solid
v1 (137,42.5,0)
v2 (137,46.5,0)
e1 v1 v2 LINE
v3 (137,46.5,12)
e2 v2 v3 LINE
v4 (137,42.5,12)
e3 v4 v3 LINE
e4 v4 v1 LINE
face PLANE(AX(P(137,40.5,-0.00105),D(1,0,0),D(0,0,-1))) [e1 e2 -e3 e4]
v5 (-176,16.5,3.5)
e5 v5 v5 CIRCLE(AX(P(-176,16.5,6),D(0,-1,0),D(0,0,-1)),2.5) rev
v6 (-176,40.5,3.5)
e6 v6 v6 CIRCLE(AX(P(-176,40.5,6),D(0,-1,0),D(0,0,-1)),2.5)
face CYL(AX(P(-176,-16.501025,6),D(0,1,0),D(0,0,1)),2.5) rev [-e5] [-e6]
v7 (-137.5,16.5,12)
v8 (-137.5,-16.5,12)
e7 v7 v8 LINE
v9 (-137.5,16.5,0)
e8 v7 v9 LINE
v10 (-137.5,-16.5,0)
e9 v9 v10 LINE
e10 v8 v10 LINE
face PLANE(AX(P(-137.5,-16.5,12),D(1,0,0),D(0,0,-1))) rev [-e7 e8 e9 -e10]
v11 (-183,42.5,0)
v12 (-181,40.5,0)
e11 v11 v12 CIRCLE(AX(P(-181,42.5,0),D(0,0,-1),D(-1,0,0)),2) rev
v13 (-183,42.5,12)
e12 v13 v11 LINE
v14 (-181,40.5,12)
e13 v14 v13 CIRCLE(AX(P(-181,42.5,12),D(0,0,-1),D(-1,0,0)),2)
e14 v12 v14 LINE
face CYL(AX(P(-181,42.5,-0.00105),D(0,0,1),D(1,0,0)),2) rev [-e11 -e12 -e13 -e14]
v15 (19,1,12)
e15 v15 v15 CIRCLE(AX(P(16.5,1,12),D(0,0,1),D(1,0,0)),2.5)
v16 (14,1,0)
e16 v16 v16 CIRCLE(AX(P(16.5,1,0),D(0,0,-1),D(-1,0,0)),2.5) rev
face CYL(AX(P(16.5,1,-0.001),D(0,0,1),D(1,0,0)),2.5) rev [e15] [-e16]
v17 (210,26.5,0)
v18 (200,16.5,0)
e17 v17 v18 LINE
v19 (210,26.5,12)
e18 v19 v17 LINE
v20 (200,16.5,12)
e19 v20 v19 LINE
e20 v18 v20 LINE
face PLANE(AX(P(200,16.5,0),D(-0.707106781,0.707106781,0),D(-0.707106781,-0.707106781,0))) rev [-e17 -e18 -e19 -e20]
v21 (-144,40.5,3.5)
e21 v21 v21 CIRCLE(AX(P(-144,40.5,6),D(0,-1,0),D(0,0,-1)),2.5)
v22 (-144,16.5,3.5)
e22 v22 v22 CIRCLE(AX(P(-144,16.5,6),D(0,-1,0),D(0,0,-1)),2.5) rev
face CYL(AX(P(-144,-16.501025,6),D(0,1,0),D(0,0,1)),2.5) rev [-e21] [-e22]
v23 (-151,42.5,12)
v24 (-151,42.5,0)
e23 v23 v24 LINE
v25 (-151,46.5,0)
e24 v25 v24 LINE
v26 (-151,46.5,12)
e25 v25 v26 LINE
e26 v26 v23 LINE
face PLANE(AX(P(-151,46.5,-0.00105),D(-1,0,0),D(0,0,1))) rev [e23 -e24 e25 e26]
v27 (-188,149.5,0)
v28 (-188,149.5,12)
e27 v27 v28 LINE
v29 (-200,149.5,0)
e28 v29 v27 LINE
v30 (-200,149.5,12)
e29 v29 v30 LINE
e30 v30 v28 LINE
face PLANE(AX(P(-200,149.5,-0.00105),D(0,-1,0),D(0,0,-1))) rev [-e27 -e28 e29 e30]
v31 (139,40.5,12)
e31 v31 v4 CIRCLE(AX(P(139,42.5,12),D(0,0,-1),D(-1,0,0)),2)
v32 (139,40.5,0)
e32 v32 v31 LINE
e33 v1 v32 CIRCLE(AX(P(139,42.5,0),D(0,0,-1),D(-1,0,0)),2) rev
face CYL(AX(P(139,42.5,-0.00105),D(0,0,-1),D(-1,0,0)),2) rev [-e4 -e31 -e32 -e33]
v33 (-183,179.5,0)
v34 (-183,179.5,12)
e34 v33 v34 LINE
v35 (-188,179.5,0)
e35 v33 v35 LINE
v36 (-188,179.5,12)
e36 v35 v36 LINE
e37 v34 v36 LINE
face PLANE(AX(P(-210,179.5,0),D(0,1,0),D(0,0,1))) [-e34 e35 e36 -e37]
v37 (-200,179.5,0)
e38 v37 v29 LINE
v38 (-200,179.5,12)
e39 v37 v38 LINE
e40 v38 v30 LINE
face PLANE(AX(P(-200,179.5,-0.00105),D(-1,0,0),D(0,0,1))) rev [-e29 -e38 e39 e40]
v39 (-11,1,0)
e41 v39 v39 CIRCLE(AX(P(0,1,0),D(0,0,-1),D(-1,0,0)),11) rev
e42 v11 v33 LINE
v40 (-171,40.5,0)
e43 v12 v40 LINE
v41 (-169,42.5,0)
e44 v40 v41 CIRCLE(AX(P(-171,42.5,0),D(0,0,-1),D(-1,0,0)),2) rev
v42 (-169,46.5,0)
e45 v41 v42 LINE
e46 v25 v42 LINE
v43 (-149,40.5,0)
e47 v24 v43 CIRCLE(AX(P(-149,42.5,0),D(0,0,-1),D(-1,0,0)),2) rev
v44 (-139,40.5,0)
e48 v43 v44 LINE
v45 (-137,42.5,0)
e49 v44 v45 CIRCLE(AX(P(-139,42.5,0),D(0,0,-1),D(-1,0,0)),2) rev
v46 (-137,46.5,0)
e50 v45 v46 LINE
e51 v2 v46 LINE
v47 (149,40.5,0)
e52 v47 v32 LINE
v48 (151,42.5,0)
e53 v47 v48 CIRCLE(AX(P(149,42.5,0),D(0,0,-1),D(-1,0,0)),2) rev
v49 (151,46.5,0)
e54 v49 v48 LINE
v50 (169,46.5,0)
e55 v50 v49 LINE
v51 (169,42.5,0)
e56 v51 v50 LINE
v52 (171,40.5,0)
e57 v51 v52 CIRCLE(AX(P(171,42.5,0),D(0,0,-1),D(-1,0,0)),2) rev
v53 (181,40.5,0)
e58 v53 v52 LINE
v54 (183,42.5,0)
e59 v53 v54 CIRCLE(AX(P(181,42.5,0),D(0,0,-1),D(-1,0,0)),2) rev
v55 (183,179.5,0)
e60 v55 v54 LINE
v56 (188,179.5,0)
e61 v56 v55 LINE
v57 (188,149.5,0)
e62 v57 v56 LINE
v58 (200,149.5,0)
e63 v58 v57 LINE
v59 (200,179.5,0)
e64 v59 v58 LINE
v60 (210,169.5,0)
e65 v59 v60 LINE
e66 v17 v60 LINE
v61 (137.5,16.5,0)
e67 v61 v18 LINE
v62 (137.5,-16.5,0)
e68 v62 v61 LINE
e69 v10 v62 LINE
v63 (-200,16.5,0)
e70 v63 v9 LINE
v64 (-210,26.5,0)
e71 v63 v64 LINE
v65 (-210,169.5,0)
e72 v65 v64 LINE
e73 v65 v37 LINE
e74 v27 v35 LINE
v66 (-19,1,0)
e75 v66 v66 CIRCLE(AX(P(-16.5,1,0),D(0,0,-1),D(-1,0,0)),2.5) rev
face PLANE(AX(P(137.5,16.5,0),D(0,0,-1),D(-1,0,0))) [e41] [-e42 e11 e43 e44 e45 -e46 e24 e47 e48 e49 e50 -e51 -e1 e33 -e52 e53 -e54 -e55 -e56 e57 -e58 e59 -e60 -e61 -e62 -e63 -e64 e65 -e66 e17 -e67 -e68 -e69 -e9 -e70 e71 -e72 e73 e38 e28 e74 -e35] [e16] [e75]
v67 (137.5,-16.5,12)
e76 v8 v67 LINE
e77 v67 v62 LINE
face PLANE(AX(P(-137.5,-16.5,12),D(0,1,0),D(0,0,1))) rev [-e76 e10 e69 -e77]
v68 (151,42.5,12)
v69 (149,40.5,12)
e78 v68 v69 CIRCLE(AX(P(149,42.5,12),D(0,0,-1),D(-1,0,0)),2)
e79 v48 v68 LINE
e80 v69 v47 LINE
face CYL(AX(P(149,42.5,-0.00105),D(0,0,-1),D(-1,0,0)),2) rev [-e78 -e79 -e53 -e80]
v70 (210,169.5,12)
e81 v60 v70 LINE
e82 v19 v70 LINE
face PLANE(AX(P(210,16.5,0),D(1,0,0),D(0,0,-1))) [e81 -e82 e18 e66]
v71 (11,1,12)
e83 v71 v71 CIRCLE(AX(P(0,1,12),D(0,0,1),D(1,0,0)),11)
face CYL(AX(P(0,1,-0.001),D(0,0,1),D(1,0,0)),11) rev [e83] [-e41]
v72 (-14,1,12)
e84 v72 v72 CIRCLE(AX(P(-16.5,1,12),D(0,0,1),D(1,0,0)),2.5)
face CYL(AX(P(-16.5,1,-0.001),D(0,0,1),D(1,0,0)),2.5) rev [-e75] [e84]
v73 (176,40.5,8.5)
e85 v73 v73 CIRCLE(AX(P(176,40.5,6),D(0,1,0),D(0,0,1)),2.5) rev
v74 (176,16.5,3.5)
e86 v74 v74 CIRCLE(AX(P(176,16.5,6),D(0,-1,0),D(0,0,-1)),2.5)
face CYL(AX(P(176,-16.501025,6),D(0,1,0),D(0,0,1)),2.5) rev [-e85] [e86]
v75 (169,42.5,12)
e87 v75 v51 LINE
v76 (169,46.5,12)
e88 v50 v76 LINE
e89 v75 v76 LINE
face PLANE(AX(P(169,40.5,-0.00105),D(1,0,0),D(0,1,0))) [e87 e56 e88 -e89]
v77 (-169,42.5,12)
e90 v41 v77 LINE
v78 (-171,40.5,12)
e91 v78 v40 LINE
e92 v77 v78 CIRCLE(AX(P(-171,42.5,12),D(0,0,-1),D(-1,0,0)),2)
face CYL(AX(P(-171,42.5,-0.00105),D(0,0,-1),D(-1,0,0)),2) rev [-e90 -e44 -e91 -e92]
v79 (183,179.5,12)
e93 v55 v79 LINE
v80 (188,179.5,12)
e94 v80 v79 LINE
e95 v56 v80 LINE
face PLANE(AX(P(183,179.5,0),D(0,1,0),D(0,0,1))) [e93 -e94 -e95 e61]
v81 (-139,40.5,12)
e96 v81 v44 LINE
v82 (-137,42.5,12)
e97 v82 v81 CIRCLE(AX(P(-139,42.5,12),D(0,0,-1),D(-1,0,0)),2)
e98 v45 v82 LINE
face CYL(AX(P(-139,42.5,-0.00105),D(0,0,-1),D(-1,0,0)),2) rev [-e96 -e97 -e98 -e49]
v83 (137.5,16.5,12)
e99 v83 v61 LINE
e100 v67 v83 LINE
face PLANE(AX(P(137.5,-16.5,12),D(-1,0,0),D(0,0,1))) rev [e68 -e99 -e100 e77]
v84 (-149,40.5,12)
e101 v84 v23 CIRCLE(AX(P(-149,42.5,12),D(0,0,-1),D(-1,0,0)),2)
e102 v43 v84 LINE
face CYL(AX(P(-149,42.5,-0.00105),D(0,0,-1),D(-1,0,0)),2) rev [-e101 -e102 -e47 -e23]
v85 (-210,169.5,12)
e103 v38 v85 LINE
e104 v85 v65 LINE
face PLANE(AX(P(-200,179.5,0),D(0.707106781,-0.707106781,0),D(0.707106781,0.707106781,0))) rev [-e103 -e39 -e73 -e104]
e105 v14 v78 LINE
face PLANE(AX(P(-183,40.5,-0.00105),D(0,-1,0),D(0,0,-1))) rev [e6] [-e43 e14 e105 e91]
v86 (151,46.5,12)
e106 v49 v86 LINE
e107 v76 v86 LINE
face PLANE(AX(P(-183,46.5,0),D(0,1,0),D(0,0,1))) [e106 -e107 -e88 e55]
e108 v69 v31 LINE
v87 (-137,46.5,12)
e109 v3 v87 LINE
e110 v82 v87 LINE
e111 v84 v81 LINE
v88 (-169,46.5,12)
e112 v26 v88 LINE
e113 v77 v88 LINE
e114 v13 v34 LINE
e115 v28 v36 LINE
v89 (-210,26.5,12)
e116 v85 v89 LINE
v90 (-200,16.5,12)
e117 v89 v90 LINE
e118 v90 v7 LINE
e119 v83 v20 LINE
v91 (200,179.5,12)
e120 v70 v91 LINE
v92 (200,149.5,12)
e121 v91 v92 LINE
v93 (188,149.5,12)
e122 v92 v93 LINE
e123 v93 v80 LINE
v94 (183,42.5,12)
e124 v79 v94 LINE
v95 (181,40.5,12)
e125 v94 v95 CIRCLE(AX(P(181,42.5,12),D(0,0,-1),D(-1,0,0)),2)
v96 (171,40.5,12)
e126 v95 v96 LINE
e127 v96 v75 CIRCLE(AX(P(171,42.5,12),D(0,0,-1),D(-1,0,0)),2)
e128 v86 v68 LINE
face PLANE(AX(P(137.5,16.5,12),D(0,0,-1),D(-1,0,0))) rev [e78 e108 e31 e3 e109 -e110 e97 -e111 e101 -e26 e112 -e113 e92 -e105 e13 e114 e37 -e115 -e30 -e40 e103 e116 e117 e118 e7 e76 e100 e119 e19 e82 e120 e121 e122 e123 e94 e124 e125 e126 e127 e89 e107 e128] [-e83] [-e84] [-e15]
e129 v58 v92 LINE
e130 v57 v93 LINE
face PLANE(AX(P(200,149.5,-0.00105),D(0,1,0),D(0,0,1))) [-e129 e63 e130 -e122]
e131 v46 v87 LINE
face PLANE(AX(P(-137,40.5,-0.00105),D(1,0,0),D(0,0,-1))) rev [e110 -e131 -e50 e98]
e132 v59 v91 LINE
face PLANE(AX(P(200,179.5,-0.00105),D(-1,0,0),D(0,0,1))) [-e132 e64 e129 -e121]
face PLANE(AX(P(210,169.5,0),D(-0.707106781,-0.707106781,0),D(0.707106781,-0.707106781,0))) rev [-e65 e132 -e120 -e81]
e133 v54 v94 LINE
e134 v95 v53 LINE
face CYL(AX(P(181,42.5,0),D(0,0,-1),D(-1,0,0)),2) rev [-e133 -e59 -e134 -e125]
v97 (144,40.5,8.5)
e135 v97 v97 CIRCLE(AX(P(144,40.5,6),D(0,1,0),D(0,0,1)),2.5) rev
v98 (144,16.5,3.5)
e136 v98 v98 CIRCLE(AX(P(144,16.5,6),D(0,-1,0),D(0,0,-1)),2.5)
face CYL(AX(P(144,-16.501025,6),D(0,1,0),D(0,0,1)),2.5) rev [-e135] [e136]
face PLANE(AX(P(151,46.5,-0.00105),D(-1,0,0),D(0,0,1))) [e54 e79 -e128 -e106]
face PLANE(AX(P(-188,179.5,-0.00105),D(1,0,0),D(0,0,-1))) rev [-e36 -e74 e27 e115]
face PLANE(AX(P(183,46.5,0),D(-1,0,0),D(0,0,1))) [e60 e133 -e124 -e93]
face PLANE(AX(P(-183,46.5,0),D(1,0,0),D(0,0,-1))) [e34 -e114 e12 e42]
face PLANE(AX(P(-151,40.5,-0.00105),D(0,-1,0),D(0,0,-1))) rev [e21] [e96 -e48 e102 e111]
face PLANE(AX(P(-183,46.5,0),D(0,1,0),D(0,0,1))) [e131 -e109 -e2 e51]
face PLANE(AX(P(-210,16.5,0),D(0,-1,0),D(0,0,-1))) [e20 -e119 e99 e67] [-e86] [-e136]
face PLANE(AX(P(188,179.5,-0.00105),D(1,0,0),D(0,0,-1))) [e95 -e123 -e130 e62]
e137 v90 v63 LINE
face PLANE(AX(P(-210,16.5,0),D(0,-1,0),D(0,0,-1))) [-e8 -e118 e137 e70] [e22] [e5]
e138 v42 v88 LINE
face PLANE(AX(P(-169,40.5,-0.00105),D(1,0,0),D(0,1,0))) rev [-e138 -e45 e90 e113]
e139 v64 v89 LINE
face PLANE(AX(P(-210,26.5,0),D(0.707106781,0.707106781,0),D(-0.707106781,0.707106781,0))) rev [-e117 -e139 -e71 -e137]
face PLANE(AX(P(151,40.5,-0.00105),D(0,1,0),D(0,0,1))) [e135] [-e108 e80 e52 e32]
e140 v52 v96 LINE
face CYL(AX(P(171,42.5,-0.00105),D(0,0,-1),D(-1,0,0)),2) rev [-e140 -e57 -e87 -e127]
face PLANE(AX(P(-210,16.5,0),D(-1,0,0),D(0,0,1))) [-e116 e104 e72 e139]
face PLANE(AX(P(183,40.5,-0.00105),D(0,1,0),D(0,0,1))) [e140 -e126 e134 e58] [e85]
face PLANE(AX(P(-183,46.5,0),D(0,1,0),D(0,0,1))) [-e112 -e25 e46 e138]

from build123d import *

# Parameters (mm, degrees)
SKETCH1_W            = 275
SKETCH1_H            = 33
BOSS_EXTRUDE1_DEPTH  = 12
CUT_EXTRUDE1_REACH   = 141.005
SKETCH2_R            = 11
SKETCH2_R_2          = 2.5
BOSS_EXTRUDE2_DEPTH  = 12
CUT_EXTRUDE2_REACH   = 250.863
SKETCH4_R            = 2.5
CUT_EXTRUDE3_REACH   = 278.522
SKETCH5_W            = 14
SKETCH5_H            = 6
FILLET1_R            = 2
FILLET1_OF_MIRROR2_R = 2
CHAMFER1_SIZE        = 10
CUT_EXTRUDE4_REACH   = 278.522
SKETCH6_W            = 12
SKETCH6_H            = 30
CHAMFER2_SIZE        = 10


with BuildPart() as part:
    # Sketch1 → Boss-Extrude1 (new body)
    with BuildSketch(Plane.XY):
        Rectangle(SKETCH1_W, SKETCH1_H)
    extrude(amount=BOSS_EXTRUDE1_DEPTH)

    # Sketch2 → Cut-Extrude1 (cut, up to next)
    with BuildSketch(Plane.XY.offset(12), mode=Mode.PRIVATE) as cut_extrude1_sk1:
        with Locations((0, 1)):
            Circle(SKETCH2_R)
    cut_extrude1_tool1 = extrude(cut_extrude1_sk1.sketch, amount=-CUT_EXTRUDE1_REACH, mode=Mode.PRIVATE) & part.part
    # Sketch2 → Cut-Extrude1 (cut, up to next)
    with BuildSketch(Plane.XY.offset(12), mode=Mode.PRIVATE) as cut_extrude1_sk2:
        with Locations((-16.5, 1)):
            Circle(SKETCH2_R_2)
    cut_extrude1_tool2 = extrude(cut_extrude1_sk2.sketch, amount=-CUT_EXTRUDE1_REACH, mode=Mode.PRIVATE) & part.part
    # Sketch2 → Cut-Extrude1 (cut, up to next)
    with BuildSketch(Plane.XY.offset(12), mode=Mode.PRIVATE) as cut_extrude1_sk3:
        with Locations((16.5, 1)):
            Circle(SKETCH2_R_2)
    cut_extrude1_tool3 = extrude(cut_extrude1_sk3.sketch, amount=-CUT_EXTRUDE1_REACH, mode=Mode.PRIVATE) & part.part
    add(cut_extrude1_tool1.solids().sort_by_distance((0, 1, 12))[0], mode=Mode.SUBTRACT)
    add(cut_extrude1_tool2.solids().sort_by_distance((-16.5, 1, 12))[0], mode=Mode.SUBTRACT)
    add(cut_extrude1_tool3.solids().sort_by_distance((16.5, 1, 12))[0], mode=Mode.SUBTRACT)

    # Sketch3 → Boss-Extrude2 (add)
    with BuildSketch(Plane.XY.offset(12)):
        Polygon((-210, 16.5), (210, 16.5), (210, 179.5), (183, 179.5), (183, 46.5), (-183, 46.5), (-183, 179.5), (-210, 179.5), align=None)
    extrude(amount=-BOSS_EXTRUDE2_DEPTH)

    # Sketch4 → Cut-Extrude2 (cut, up to next)
    with BuildSketch(Plane(origin=(0, 46.5, 0), x_dir=(1, 0, 0), z_dir=(0, 1, 0)), mode=Mode.PRIVATE) as cut_extrude2_sk1:
        with Locations(Location((-144, -6, 0), (0, 0, 270))):
            Circle(SKETCH4_R)
    cut_extrude2_tool1 = extrude(cut_extrude2_sk1.sketch, amount=-CUT_EXTRUDE2_REACH, mode=Mode.PRIVATE) & part.part
    # Sketch4 → Cut-Extrude2 (cut, up to next)
    with BuildSketch(Plane(origin=(0, 46.5, 0), x_dir=(1, 0, 0), z_dir=(0, 1, 0)), mode=Mode.PRIVATE) as cut_extrude2_sk2:
        with Locations(Location((-176, -6, 0), (0, 0, 270))):
            Circle(SKETCH4_R)
    cut_extrude2_tool2 = extrude(cut_extrude2_sk2.sketch, amount=-CUT_EXTRUDE2_REACH, mode=Mode.PRIVATE) & part.part
    cut_extrude2_1 = cut_extrude2_tool1.solids().sort_by_distance((-144, 46.5, 6))[0]
    add(cut_extrude2_1, mode=Mode.SUBTRACT)
    cut_extrude2_2 = cut_extrude2_tool2.solids().sort_by_distance((-176, 46.5, 6))[0]
    add(cut_extrude2_2, mode=Mode.SUBTRACT)
    cut_extrude2 = cut_extrude2_1 + cut_extrude2_2  # Cut-Extrude2 as one shape, for the pattern or mirror that repeats it

    # Mirror1: Cut-Extrude2 across plane
    add(cut_extrude2.mirror(Plane(origin=(0, 0, 0), x_dir=(0, 0, 1), z_dir=(1, 0, 0))), mode=Mode.SUBTRACT)

    # Sketch5 → Cut-Extrude3 (cut, up to next)
    with BuildSketch(Plane.XY.offset(12), mode=Mode.PRIVATE) as cut_extrude3_sk1:
        with Locations((-176, 43.5)):
            Rectangle(SKETCH5_W, SKETCH5_H)
    cut_extrude3_tool1 = extrude(cut_extrude3_sk1.sketch, amount=-CUT_EXTRUDE3_REACH, mode=Mode.PRIVATE) & part.part
    # Sketch5 → Cut-Extrude3 (cut, up to next)
    with BuildSketch(Plane.XY.offset(12), mode=Mode.PRIVATE) as cut_extrude3_sk2:
        with Locations((-144, 43.5)):
            Rectangle(SKETCH5_W, SKETCH5_H)
    cut_extrude3_tool2 = extrude(cut_extrude3_sk2.sketch, amount=-CUT_EXTRUDE3_REACH, mode=Mode.PRIVATE) & part.part
    cut_extrude3_1 = cut_extrude3_tool1.solids().sort_by_distance((-176, 43.5, 12))[0]
    add(cut_extrude3_1, mode=Mode.SUBTRACT)
    cut_extrude3_2 = cut_extrude3_tool2.solids().sort_by_distance((-144, 43.5, 12))[0]
    add(cut_extrude3_2, mode=Mode.SUBTRACT)
    cut_extrude3 = cut_extrude3_1 + cut_extrude3_2  # Cut-Extrude3 as one shape, for the pattern or mirror that repeats it

    # Fillet1
    fillet1_edges = [part.edges().sort_by_distance(p)[0] for p in [
        (-169, 40.5, 6),
        (-183, 40.5, 6),
        (-137, 40.5, 6),
        (-151, 40.5, 6),
    ]]
    fillet(fillet1_edges, radius=FILLET1_R)

    # Mirror2: Cut-Extrude3 across plane
    add(cut_extrude3.mirror(Plane(origin=(0, 0, 0), x_dir=(0, 0, 1), z_dir=(1, 0, 0))), mode=Mode.SUBTRACT)

    # Fillet1 of Mirror2
    fillet1_of_mirror2_edges = [part.edges().sort_by_distance(p)[0] for p in [
        (169, 40.5, 6),
        (183, 40.5, 6),
        (137, 40.5, 6),
        (151, 40.5, 6),
    ]]
    fillet(fillet1_of_mirror2_edges, radius=FILLET1_OF_MIRROR2_R)

    # Chamfer1
    chamfer1_edges = [part.edges().sort_by_distance(p)[0] for p in [
        (210, 16.5, 6),
        (-210, 16.5, 6),
    ]]
    chamfer(chamfer1_edges, length=CHAMFER1_SIZE)

    # Sketch6 → Cut-Extrude4 (cut, up to next)
    with BuildSketch(Plane.XY.offset(12), mode=Mode.PRIVATE) as cut_extrude4_sk1:
        with Locations((-194, 164.5)):
            Rectangle(SKETCH6_W, SKETCH6_H)
    cut_extrude4_tool1 = extrude(cut_extrude4_sk1.sketch, amount=-CUT_EXTRUDE4_REACH, mode=Mode.PRIVATE) & part.part
    cut_extrude4 = cut_extrude4_tool1.solids().sort_by_distance((-194, 164.5, 12))[0]
    add(cut_extrude4, mode=Mode.SUBTRACT)

    # Mirror3: Cut-Extrude4 across plane
    add(cut_extrude4.mirror(Plane(origin=(0, 0, 0), x_dir=(0, 0, 1), z_dir=(1, 0, 0))), mode=Mode.SUBTRACT)

    # Chamfer2
    chamfer2_edges = [part.edges().sort_by_distance(p)[0] for p in [
        (210, 179.5, 6),
        (-210, 179.5, 6),
    ]]
    chamfer(chamfer2_edges, length=CHAMFER2_SIZE - 0.0001)  # a hair under: the kernel refuses the full size


solid = part.part
